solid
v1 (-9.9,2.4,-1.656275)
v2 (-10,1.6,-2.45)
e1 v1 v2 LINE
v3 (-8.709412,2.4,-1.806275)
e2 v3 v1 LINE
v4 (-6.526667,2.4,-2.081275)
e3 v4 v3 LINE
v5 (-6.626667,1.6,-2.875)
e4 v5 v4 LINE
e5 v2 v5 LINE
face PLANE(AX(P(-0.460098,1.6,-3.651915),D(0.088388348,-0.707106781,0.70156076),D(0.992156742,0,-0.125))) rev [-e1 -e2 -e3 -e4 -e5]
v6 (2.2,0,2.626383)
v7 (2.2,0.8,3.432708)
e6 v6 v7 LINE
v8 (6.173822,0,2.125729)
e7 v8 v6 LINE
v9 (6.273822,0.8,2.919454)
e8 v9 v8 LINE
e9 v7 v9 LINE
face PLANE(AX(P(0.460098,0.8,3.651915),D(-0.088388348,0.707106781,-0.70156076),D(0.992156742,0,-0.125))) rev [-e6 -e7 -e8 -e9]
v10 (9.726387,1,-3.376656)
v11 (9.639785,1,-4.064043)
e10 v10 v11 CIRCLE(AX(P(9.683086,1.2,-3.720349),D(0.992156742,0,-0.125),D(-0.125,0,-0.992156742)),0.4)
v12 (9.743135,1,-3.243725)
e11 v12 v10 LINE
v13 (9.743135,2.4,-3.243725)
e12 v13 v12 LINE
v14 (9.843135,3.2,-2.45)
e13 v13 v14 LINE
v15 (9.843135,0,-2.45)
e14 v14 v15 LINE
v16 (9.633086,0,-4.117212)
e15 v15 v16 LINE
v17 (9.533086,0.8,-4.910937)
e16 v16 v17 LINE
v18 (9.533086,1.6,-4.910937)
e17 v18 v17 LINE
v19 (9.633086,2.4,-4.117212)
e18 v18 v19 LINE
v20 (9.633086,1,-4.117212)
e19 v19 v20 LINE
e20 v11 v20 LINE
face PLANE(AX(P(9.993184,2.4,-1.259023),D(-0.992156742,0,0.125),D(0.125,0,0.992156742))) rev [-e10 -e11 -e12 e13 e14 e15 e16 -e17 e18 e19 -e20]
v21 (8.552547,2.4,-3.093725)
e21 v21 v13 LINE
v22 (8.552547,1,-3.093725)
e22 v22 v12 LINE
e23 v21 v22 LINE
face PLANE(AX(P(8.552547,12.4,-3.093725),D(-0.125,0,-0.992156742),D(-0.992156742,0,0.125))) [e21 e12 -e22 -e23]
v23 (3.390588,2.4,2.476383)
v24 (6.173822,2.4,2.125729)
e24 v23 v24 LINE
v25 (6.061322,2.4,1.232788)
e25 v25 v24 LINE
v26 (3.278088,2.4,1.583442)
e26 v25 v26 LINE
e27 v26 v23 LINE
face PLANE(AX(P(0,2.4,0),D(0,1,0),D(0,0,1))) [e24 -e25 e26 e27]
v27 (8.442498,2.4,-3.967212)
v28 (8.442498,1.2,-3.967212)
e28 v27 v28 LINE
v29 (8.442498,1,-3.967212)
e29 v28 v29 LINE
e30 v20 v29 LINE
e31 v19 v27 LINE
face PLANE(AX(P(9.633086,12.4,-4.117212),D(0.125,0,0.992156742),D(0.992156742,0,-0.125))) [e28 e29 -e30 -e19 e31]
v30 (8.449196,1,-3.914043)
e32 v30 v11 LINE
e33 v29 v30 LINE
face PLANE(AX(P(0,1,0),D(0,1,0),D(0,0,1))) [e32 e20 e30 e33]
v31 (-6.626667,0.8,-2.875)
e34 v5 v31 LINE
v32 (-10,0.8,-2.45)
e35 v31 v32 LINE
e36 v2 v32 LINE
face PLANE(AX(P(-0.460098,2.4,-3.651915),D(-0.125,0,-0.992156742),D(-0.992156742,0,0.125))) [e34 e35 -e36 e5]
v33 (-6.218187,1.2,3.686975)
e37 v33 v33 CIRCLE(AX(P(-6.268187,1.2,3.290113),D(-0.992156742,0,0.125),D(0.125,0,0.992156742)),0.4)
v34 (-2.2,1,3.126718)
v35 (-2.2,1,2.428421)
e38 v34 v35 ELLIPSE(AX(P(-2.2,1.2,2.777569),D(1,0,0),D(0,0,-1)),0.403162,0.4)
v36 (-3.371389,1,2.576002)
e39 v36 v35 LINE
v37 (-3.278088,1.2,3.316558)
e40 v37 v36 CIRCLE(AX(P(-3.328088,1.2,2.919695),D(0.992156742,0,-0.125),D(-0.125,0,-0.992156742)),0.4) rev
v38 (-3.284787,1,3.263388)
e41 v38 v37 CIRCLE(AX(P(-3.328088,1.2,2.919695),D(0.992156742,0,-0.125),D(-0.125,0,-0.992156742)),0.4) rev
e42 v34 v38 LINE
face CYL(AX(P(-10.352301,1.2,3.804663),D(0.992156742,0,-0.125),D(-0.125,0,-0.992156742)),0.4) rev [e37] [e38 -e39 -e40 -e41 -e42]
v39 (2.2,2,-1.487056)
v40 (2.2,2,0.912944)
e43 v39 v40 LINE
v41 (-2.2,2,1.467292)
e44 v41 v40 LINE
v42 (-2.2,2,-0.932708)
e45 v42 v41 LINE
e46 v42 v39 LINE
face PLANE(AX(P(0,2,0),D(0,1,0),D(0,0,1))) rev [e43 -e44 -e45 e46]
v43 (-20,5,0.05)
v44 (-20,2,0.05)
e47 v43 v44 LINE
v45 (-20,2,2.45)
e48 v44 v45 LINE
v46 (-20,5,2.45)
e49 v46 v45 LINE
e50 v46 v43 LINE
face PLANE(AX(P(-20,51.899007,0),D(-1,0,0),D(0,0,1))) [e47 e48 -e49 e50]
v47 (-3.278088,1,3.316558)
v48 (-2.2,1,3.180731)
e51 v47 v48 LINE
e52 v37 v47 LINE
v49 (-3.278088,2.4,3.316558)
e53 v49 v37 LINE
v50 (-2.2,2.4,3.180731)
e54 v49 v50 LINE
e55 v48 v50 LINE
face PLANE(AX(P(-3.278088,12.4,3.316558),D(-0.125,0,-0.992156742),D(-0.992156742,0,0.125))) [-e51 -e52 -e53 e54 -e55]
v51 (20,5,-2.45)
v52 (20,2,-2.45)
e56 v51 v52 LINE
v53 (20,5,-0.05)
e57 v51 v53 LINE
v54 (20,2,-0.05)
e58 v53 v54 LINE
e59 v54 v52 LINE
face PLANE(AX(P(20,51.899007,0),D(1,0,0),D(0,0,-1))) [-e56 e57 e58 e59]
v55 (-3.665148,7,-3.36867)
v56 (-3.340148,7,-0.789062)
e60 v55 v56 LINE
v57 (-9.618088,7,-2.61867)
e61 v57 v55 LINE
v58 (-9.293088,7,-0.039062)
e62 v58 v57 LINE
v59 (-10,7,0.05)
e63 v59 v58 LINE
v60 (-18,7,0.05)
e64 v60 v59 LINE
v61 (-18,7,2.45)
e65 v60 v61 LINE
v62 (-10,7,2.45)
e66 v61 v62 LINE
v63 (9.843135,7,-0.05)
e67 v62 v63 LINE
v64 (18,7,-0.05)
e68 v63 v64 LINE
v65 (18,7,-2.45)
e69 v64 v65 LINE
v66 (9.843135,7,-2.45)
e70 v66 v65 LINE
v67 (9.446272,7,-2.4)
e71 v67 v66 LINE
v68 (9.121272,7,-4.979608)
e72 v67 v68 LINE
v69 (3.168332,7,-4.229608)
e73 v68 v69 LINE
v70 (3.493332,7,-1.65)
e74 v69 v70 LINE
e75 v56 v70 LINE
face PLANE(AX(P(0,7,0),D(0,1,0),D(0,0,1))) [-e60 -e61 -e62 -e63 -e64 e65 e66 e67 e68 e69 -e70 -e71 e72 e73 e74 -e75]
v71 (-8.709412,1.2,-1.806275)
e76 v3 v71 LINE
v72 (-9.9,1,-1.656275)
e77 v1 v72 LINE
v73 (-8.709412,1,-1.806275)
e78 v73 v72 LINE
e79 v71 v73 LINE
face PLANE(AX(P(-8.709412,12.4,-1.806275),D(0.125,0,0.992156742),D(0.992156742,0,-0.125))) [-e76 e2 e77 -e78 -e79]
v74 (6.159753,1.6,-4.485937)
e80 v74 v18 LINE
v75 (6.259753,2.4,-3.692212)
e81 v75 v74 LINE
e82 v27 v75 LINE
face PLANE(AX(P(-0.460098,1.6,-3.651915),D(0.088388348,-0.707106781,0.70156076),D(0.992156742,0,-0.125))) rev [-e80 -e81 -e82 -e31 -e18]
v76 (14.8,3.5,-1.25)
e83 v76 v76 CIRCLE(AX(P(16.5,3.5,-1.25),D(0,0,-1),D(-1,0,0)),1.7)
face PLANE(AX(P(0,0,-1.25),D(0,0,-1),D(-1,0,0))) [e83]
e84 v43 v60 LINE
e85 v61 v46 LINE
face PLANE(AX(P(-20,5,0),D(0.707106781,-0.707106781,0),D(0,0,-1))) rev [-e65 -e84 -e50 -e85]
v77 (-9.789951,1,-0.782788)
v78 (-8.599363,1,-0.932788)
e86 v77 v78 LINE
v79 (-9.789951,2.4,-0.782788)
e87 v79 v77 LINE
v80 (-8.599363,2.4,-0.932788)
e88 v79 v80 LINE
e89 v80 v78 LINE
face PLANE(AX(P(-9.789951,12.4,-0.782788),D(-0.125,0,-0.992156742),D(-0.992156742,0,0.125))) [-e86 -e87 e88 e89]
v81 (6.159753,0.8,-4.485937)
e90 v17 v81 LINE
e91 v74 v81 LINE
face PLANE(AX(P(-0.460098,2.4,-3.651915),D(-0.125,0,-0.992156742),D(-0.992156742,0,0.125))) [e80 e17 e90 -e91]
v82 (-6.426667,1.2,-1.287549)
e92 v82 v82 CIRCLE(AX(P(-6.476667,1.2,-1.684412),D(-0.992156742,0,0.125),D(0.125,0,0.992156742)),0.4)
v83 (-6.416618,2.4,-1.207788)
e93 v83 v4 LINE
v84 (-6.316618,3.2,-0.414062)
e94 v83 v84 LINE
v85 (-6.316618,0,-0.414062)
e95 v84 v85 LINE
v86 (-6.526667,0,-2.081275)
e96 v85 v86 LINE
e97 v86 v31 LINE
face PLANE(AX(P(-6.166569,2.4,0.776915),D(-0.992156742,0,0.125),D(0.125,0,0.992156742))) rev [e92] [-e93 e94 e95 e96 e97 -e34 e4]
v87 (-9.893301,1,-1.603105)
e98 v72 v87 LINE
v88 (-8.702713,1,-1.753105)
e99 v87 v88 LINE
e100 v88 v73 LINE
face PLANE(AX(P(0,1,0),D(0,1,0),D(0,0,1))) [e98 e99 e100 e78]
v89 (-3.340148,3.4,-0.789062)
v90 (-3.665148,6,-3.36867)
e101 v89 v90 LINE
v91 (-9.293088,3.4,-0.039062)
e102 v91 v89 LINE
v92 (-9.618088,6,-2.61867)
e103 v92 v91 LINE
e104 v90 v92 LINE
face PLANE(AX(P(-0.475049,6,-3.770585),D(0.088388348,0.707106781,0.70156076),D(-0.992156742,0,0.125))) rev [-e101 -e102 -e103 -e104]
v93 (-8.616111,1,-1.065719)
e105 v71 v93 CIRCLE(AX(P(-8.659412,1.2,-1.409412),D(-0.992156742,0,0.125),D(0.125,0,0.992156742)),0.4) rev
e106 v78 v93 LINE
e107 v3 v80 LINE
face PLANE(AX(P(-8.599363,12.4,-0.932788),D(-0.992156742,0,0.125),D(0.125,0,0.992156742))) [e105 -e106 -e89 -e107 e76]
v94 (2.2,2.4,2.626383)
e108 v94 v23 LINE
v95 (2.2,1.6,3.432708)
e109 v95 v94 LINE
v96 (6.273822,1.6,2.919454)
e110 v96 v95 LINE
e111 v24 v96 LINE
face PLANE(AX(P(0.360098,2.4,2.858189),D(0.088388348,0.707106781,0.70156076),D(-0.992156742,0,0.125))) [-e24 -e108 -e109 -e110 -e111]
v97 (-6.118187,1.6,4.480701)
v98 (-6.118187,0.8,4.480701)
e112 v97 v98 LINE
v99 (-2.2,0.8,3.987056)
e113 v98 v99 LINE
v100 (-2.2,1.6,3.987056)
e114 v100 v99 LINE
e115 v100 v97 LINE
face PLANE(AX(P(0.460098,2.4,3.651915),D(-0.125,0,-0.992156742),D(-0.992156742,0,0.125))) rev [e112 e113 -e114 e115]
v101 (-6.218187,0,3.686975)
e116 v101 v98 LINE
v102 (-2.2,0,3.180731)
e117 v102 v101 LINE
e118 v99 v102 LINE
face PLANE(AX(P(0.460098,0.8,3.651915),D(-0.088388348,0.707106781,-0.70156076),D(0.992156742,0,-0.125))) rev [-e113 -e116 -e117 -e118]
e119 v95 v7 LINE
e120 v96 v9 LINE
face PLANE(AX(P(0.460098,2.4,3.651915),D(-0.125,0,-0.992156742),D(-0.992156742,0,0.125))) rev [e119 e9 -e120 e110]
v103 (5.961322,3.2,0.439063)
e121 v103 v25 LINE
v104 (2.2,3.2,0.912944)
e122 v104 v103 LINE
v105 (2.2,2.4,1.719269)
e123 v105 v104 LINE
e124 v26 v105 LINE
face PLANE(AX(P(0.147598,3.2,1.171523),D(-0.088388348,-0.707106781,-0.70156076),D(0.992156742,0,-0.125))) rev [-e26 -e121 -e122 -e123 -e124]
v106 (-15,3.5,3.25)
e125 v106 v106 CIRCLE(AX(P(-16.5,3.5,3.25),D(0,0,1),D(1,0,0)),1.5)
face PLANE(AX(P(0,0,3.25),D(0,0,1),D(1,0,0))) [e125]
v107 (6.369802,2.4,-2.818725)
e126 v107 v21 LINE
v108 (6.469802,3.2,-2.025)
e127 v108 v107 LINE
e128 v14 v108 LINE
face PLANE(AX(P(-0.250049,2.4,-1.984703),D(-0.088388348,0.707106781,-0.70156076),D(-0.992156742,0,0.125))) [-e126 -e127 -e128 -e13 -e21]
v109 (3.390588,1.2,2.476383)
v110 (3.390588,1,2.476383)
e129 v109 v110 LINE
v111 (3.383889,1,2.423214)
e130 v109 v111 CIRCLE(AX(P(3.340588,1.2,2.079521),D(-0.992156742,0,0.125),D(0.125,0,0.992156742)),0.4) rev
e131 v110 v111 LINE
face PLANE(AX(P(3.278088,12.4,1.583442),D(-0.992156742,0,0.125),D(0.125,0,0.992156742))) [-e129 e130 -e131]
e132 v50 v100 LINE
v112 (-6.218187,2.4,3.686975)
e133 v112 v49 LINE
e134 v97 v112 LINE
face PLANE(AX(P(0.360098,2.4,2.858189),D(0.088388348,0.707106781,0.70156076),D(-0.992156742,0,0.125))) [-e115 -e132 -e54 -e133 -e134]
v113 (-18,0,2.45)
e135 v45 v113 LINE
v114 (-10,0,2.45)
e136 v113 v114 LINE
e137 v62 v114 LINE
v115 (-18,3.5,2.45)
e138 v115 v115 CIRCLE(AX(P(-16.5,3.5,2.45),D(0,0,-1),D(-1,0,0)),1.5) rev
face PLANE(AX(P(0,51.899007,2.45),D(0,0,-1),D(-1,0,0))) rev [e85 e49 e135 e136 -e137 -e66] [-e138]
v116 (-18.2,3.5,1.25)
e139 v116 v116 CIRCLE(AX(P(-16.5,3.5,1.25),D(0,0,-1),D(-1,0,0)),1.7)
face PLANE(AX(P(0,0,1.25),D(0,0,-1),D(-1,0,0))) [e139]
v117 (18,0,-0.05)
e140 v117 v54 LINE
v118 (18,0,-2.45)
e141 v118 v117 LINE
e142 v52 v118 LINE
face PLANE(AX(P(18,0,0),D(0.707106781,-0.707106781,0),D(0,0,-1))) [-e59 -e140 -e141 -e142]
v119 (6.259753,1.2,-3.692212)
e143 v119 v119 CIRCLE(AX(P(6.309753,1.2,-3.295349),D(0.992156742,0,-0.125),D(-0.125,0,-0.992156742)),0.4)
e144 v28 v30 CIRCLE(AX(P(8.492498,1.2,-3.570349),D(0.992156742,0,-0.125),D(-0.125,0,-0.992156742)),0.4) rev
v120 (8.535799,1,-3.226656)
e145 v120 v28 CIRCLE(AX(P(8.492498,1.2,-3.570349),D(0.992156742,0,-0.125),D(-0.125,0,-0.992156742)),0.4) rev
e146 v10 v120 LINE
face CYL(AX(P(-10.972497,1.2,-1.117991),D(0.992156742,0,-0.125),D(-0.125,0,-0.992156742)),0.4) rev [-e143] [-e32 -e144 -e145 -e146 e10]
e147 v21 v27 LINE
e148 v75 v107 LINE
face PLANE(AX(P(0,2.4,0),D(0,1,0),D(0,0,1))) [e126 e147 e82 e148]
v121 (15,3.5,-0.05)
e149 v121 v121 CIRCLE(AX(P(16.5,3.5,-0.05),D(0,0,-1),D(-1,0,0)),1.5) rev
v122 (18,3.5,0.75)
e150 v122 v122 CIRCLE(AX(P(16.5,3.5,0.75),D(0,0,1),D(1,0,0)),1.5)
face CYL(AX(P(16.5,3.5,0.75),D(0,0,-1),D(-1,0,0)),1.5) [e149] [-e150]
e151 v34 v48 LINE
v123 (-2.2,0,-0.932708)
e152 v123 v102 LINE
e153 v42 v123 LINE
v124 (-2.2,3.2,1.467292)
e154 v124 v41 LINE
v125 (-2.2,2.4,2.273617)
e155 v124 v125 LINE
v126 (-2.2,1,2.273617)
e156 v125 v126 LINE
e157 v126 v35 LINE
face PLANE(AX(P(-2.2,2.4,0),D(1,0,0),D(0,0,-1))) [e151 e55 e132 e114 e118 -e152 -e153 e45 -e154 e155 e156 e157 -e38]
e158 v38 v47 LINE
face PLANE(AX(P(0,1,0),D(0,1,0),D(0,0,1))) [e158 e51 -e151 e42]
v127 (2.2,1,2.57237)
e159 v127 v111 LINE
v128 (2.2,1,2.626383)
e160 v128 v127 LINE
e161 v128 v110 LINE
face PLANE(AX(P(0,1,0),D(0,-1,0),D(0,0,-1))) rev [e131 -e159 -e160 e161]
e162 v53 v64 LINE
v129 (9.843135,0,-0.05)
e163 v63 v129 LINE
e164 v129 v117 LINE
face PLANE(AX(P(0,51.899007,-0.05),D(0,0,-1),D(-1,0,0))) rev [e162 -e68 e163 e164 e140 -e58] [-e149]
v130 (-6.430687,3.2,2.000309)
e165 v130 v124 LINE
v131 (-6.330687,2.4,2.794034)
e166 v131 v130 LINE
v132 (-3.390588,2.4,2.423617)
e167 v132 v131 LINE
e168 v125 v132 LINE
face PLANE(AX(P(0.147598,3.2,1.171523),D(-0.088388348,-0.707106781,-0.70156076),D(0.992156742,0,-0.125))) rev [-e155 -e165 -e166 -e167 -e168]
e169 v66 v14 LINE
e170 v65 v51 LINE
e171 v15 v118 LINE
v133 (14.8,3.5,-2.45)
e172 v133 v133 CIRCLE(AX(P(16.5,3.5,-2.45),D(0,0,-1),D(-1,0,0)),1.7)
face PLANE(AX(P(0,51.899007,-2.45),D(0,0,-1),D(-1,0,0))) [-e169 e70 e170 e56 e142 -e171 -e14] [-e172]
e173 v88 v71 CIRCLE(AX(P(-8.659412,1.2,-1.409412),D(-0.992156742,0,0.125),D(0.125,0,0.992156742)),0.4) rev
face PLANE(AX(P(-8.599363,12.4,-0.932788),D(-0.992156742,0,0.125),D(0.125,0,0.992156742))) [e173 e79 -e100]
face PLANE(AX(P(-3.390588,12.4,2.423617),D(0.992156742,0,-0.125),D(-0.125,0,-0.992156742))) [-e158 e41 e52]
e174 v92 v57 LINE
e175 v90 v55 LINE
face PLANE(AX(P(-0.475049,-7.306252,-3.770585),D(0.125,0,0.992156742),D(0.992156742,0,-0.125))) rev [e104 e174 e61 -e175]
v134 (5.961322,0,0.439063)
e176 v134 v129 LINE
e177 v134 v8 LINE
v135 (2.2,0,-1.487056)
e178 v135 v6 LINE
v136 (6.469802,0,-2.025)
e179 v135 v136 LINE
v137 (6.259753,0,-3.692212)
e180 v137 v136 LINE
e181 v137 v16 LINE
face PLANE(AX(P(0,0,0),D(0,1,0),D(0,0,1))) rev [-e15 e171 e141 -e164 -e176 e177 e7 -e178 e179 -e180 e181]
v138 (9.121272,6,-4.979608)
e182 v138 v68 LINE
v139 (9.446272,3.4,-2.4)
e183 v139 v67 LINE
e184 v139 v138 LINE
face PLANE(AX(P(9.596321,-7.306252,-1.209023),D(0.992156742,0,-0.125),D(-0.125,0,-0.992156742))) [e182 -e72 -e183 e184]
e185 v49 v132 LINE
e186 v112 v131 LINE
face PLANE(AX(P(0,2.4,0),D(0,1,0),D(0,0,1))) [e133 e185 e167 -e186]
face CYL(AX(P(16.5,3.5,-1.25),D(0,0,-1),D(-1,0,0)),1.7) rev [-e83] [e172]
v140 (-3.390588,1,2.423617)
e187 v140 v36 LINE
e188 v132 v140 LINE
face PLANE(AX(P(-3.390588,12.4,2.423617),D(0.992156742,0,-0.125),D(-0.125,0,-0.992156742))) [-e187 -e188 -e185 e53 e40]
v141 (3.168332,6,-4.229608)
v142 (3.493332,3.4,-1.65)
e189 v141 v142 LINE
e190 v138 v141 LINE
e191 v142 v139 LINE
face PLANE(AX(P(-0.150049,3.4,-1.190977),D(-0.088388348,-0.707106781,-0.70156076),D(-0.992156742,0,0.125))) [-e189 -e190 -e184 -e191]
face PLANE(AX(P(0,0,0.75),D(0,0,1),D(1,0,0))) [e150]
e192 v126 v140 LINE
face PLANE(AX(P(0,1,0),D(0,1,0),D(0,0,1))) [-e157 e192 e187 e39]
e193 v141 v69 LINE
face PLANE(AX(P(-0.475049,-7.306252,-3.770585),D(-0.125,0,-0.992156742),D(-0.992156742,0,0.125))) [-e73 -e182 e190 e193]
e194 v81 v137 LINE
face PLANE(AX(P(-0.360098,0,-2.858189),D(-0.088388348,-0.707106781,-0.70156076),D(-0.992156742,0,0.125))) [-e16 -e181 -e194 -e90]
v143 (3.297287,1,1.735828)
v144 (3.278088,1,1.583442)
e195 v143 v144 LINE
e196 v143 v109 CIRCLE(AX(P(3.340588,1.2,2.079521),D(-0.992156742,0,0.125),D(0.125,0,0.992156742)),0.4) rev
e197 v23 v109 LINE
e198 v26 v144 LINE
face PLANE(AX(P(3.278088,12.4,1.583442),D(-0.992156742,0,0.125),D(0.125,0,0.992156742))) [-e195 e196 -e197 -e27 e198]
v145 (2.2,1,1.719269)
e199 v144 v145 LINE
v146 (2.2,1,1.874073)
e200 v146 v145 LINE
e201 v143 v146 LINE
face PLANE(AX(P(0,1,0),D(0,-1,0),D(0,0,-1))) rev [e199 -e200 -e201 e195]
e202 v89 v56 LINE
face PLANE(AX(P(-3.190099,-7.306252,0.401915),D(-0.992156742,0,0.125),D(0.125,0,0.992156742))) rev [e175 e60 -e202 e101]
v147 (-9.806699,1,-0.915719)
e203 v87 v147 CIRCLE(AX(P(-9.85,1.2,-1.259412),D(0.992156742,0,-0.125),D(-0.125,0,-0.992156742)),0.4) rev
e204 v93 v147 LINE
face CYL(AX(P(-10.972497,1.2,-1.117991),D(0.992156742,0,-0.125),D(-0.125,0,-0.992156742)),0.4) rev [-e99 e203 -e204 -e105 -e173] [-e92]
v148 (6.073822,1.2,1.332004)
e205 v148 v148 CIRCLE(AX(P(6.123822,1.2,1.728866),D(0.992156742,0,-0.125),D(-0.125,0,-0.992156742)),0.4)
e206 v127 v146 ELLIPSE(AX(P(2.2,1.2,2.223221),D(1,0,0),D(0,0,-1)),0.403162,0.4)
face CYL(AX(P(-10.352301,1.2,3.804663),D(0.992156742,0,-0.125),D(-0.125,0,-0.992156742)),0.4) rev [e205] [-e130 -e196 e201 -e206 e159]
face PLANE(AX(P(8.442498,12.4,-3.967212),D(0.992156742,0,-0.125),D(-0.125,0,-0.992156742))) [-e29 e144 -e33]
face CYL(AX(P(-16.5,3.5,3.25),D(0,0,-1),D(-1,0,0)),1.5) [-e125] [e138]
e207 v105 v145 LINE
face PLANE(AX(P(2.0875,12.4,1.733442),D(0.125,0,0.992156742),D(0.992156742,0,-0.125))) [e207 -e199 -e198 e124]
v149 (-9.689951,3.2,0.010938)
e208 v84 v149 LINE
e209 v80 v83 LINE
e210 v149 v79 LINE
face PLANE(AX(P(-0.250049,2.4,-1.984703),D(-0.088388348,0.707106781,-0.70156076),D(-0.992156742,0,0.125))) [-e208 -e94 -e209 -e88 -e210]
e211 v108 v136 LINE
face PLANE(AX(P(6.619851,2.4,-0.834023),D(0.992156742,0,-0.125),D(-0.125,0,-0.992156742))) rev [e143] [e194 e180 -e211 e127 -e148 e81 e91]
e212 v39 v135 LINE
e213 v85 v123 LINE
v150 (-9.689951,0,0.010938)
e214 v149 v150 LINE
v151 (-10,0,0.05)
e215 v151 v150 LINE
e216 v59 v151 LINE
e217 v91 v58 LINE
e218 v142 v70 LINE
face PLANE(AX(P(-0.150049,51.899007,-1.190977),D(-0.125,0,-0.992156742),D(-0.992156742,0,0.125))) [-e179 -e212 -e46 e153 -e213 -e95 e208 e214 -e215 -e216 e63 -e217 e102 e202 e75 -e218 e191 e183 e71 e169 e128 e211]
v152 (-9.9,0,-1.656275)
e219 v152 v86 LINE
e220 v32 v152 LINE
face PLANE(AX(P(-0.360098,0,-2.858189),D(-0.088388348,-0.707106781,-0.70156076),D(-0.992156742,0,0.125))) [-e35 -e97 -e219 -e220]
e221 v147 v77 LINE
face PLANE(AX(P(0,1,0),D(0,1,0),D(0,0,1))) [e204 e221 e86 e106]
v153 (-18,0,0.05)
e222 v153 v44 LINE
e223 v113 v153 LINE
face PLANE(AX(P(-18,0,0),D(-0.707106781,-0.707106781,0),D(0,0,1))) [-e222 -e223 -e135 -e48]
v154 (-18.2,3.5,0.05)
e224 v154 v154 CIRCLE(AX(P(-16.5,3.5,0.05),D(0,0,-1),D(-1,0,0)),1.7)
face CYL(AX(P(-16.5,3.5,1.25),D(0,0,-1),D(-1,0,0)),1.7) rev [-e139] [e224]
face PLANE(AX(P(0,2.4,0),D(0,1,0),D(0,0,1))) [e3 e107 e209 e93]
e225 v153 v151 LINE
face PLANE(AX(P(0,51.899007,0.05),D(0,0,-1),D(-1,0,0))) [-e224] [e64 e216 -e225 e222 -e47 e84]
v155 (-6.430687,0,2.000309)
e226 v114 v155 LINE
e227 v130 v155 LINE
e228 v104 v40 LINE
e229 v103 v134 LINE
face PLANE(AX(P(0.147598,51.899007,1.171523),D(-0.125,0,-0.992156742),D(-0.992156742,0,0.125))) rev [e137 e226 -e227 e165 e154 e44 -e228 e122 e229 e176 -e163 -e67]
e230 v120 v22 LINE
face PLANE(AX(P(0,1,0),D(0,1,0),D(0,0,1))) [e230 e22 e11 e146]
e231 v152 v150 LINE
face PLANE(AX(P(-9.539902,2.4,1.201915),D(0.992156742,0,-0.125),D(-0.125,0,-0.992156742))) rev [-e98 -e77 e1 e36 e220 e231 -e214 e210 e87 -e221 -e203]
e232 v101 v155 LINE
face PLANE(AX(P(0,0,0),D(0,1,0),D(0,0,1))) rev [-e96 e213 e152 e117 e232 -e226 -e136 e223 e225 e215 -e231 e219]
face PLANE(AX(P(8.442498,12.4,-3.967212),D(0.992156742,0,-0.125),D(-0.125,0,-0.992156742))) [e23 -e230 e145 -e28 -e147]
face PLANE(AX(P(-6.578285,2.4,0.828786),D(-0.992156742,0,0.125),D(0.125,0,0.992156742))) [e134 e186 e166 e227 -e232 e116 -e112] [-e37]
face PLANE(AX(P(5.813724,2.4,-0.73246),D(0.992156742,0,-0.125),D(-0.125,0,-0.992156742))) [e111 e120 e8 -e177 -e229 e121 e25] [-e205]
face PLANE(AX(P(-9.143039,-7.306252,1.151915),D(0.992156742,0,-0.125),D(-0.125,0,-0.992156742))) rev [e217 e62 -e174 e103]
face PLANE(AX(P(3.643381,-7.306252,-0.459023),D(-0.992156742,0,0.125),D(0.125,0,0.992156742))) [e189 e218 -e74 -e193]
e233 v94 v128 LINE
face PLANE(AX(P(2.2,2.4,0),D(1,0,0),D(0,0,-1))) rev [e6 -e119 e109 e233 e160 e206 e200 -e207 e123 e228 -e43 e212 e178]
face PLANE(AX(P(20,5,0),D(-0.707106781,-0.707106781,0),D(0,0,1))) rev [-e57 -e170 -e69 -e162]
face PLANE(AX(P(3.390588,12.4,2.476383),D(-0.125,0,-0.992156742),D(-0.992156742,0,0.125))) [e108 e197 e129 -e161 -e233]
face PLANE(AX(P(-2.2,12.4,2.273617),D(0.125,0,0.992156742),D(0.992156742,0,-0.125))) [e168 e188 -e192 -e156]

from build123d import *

# Parameters (mm, degrees)
BOSS_EXTRUDE4_DEPTH      = 2.4
BOSS_EXTRUDE4_2_DEPTH    = 2.4
BOSS_EXTRUDE4_3_DEPTH    = 2.4
BOSS_EXTRUDE4_4_DEPTH    = 2.4
BOSS_EXTRUDE5_DEPTH      = 7
SKETCH2_R                = 1.499999999999997
BOSS_EXTRUDE8_DEPTH      = 0.8
SKETCH3_R                = 1.5000000000000007
BOSS_EXTRUDE9_DEPTH      = 0.8
SKETCH4_R                = 1.6999999999999995
CUT_EXTRUDE3_DEPTH       = 1.2
SKETCH5_R                = 1.6999999999999995
CUT_EXTRUDE4_DEPTH       = 1.2
CHAMFER4_SIZE            = 2
CUT_EXTRUDE7_REACH       = 33.329
SKETCH8_R                = 0.3999999999999905
SKETCH8_R_2              = 0.4000000000000032
CUT_EXTRUDE10_DEPTH      = 2
CHAMFER6_SIZE            = 0.8
CUT_EXTRUDE11_DEPTH      = 10
CUT_EXTRUDE11_DEPTH_BACK = 1.4
BOSS_EXTRUDE10_DEPTH     = 3.6
CHAMFER8_SIZE            = 2.6


with BuildPart() as part:
    # Sketch1 → Boss-Extrude4 (new body)
    with BuildSketch(Plane(origin=(0, 0, 0), x_dir=(1, 0, 0), z_dir=(0, 1, 0))):
        Polygon((-6.430686748297487, -2.000308799271804), (-6.118186748297487, -4.480700653394857), (-2.1999999999999993, -3.9870555235708633), (-2.1999999999999997, -1.4672923701760037), align=None)
    extrude(amount=BOSS_EXTRUDE4_DEPTH)



with BuildPart() as body_2:
    # Sketch1 → Boss-Extrude4 2 (new body)
    with BuildSketch(Plane(origin=(0, 0, 0), x_dir=(1, 0, 0), z_dir=(0, 1, 0))):
        Polygon((-10.000000000000064, 2.4499999999999993), (-9.689951018234682, -0.01093750000000027), (-6.316618096627332, 0.41406249999999967), (-6.626667078392713, 2.8750000000000004), align=None)
    extrude(amount=BOSS_EXTRUDE4_2_DEPTH)


with BuildPart() as body_3:
    # Sketch1 → Boss-Extrude4 3 (new body)
    with BuildSketch(Plane(origin=(0, 0, 0), x_dir=(1, 0, 0), z_dir=(0, 1, 0))):
        Polygon((5.961321581281771, -0.4390625000000079), (2.200000000000001, -0.9129444764291388), (2.200000000000001, -3.432707629823996), (6.273821581281774, -2.919454354123064), align=None)
    extrude(amount=BOSS_EXTRUDE4_3_DEPTH)


with BuildPart() as body_4:
    # Sketch1 → Boss-Extrude4 4 (new body)
    with BuildSketch(Plane(origin=(0, 0, 0), x_dir=(1, 0, 0), z_dir=(0, 1, 0))):
        Polygon((6.159752929611616, 4.485937500000006), (6.469801911377001, 2.025000000000001), (9.843134832984354, 2.4499999999999993), (9.533085851218969, 4.910937500000012), align=None)
    extrude(amount=BOSS_EXTRUDE4_4_DEPTH)


with BuildPart() as part_1:
    add(part.part)

    add(body_2.part)  # Boss-Extrude5 merges body 2

    add(body_3.part)  # Boss-Extrude5 merges body 3

    add(body_4.part)  # Boss-Extrude5 merges body 4
    # Sketch1<8> → Boss-Extrude5 (add)
    with BuildSketch(Plane(origin=(0, 0, 0), x_dir=(1, 0, 0), z_dir=(0, 1, 0))):
        Polygon((-20, -0.05000000000000027), (-20, -2.45), (-12, -2.4499999999999997), (-10.000000000000064, -2.4499999999999997), (-6.430686748297488, -2.000308799271796), (-2.5125, -1.5066636694477982), (-2.1999999999999993, -1.467292370176004), (-2.1999999999999997, 0.9327076298239989), (-6.316618096627332, 0.41406249999999967), (-9.689951018234682, -0.01093750000000025), (-10.000000000000064, -0.05000000000000029), (-12, -0.05000000000000027), align=None)
        Polygon((2.2000000000000006, 1.487055523570866), (2.2000000000000006, -0.9129444764291423), (5.961321581281771, -0.4390625000000079), (9.687500000000064, 0.03039185412306233), (9.843134832984425, 0.05000000000000027), (12, 0.05000000000000013), (20, 0.05000000000000013), (20, 2.4499999999999997), (12, 2.4499999999999993), (9.843134832984353, 2.4499999999999993), (6.469801911376997, 2.024999999999999), (2.510048981765383, 1.526118023570866), align=None)
        Polygon((-2.1999999999999997, 0.9327076298239989), (-2.1999999999999997, -1.4672923701760037), (2.200000000000001, -0.9129444764291388), (2.2000000000000006, 1.487055523570866), align=None)
    extrude(amount=BOSS_EXTRUDE5_DEPTH)

    # Sketch2 → Boss-Extrude8 (add)
    with BuildSketch(Plane.XY.offset(2.4499999999999993)):
        with Locations(Location((-16.5, 3.4999999999999996, 0), (0, 0, 180))):
            Circle(SKETCH2_R)
    extrude(amount=BOSS_EXTRUDE8_DEPTH)

    # Sketch3 → Boss-Extrude9 (add)
    with BuildSketch(Plane.XY.offset(-0.05000000000000013)):
        with Locations(Location((16.5, 3.4999999999999996, 0), (0, 0, 180))):
            Circle(SKETCH3_R)
    extrude(amount=BOSS_EXTRUDE9_DEPTH)

    # Sketch4 → Cut-Extrude3 (cut)
    with BuildSketch(Plane(origin=(0, 0, 0.05000000000000041), x_dir=(-1, 0, -5e-17), z_dir=(5e-17, 0, -1))):
        with Locations((16.5, 3.4999999999999996)):
            Circle(SKETCH4_R)
    extrude(amount=-CUT_EXTRUDE3_DEPTH, mode=Mode.SUBTRACT)

    # Sketch5 → Cut-Extrude4 (cut)
    with BuildSketch(Plane(origin=(-1e-16, 0, -2.449999999999999), x_dir=(-1, 0, 5e-17), z_dir=(-5e-17, 0, -1))):
        with Locations((-16.5, 3.4999999999999996)):
            Circle(SKETCH5_R)
    extrude(amount=-CUT_EXTRUDE4_DEPTH, mode=Mode.SUBTRACT)

    # Chamfer4
    chamfer4_edges = [part_1.edges().sort_by_distance(p)[0] for p in [
        (20, 7, -1.25),
        (-20, 7, 1.2500000000000002),
        (-20, 0, 1.2500000000000002),
        (20, 0, -1.25),
    ]]
    chamfer(chamfer4_edges, length=CHAMFER4_SIZE)

    # Cut-Extrude7: up to this face of the body (flat: up to its plane)
    cut_extrude7_end = Plane(part_1.part.faces().sort_by_distance((-9.844975509, 1.2, -1.21953125))[0])
    # Sketch8 → Cut-Extrude7 (cut, up to the picked face)
    with BuildSketch(Plane(origin=(9.99318385334905, 0, -1.2590228229384695), x_dir=(-0.12500000000000053, 0, -0.9921567416492215), z_dir=(0.9921567416492215, 0, -0.12500000000000053)), mode=Mode.PRIVATE) as cut_extrude7_sk1:
        with Locations((2.4807840170405906, 1.2000000000000017)):
            Circle(SKETCH8_R)
    cut_extrude7_tool1 = split(extrude(cut_extrude7_sk1.sketch, amount=-CUT_EXTRUDE7_REACH, mode=Mode.PRIVATE), bisect_by=cut_extrude7_end, keep=Keep.BOTH, mode=Mode.PRIVATE)
    # Sketch8 → Cut-Extrude7 (cut, up to the picked face)
    with BuildSketch(Plane(origin=(9.99318385334905, 0, -1.2590228229384695), x_dir=(-0.12500000000000053, 0, -0.9921567416492215), z_dir=(0.9921567416492215, 0, -0.12500000000000053)), mode=Mode.PRIVATE) as cut_extrude7_sk2:
        with Locations((-2.4807840170405973, 1.200000000000001)):
            Circle(SKETCH8_R_2)
    cut_extrude7_tool2 = split(extrude(cut_extrude7_sk2.sketch, amount=-CUT_EXTRUDE7_REACH, mode=Mode.PRIVATE), bisect_by=cut_extrude7_end, keep=Keep.BOTH, mode=Mode.PRIVATE)
    add(cut_extrude7_tool1.solids().sort_by(Axis((9.683086, 1.2, -3.720349), (-0.9921567416492215, 0, 0.12500000000000053)))[0], mode=Mode.SUBTRACT)
    add(cut_extrude7_tool2.solids().sort_by(Axis((10.303282, 1.2, 1.202304), (-0.9921567416492215, 0, 0.12500000000000053)))[0], mode=Mode.SUBTRACT)

    # Sketch1<10> → Cut-Extrude10 (cut)
    with BuildSketch(Plane(origin=(0, 0, 0), x_dir=(1, 0, 0), z_dir=(0, 1, 0))):
        Polygon((-2.1999999999999997, 0.9327076298239989), (-2.1999999999999997, -1.4672923701760037), (2.200000000000001, -0.9129444764291388), (2.2000000000000006, 1.487055523570866), align=None)
        Polygon((-2.2, 3.432707629823986), (-2.1999999999999997, 0.9327076298239989), (2.200000000000001, 1.487055523570866), (2.2, 3.987055523570867), align=None)
        Polygon((2.200000000000001, -0.9129444764291388), (-2.1999999999999993, -1.467292370176004), (-2.1999999999999993, -3.9870555235708607), (2.200000000000003, -3.432707629823997), align=None)
    extrude(amount=CUT_EXTRUDE10_DEPTH, mode=Mode.SUBTRACT)

    # Chamfer6
    chamfer6_edges = [part_1.edges().sort_by_distance(p)[0] for p in [
        (4.080660790640886, 2.4, 0.6760034882145733),
        (-4.315343374148743, 2.4, 1.7338005847239037),
        (-4.159093374148743, 0, 4.233878088482863),
        (-4.159093374148743, 2.4, 4.233878088482863),
        (7.846419390415299, 2.4, -4.698437499999993),
        (8.156468372180676, 2.4, -2.237499999999999),
        (7.846419390415299, 0, -4.698437499999993),
        (4.236910790640888, 2.4, 3.1760809919735298),
        (-8.313333539196389, 2.4, -2.6624999999999988),
        (-8.003284557431007, 2.4, -0.20156249999999976),
        (-8.313333539196389, 0, -2.6624999999999988),
        (4.236910790640888, 0, 3.1760809919735298),
    ]]
    chamfer(chamfer6_edges, length=CHAMFER6_SIZE)

    # Sketch9 → Cut-Extrude11 (cut, two sides: drawn at the far end of the back side and taken through both)
    with BuildSketch(Plane(origin=(0, 2.4, 0), x_dir=(1, 0, 0), z_dir=(0, 1, 0)).offset(-CUT_EXTRUDE11_DEPTH_BACK)):
        Polygon((-9.900000000000063, 1.6562746066806198), (-9.789951018234682, 0.7827878933193786), (-8.599362928255616, 0.9327878933193787), (-8.709411910020998, 1.8062746066806201), align=None)
        Polygon((-2.1999999999999993, -2.2736165792623466), (-3.390588089979065, -2.423616579262345), (-3.2780880899790614, -3.3165576467466713), (-2.087499999999996, -3.1665576467466714), align=None)
        Polygon((2.200000000000001, -2.626383420737649), (2.087499999999998, -1.733442353253328), (3.278088089979064, -1.5834423532533284), (3.3905880899790666, -2.47638342073765), align=None)
        Polygon((9.633085851218974, 4.117212106680604), (8.442497761239908, 3.967212106680604), (8.552546743005287, 3.0937253933193816), (9.743134832984353, 3.2437253933193815), align=None)
    extrude(amount=CUT_EXTRUDE11_DEPTH + CUT_EXTRUDE11_DEPTH_BACK, mode=Mode.SUBTRACT)

    # Sketch10 → Boss-Extrude10 (add)
    with BuildSketch(Plane(origin=(0, 6.999999999999999, 0), x_dir=(1, 0, 0), z_dir=(0, 1, 0))):
        Polygon((9.121272136324666, 4.979607528287985), (3.168331686429335, 4.22960752828798), (3.493331686429336, 1.6499999999999986), (9.446272136324666, 2.4000000000000035), align=None)
        Polygon((-9.618088321575, 2.6186700282879727), (-9.293088321574997, 0.03906249999999938), (-3.3401478716796675, 0.7890624999999998), (-3.665147871679668, 3.3686700282879767), align=None)
    extrude(amount=-BOSS_EXTRUDE10_DEPTH)

    # Chamfer8
    chamfer8_edges = [part_1.edges().sort_by_distance(p)[0] for p in [
        (-6.641618096627334, 3.399999999999999, -2.9936700282879745),
        (6.144801911377001, 3.399999999999999, -4.604607528287982),
    ]]
    chamfer(chamfer8_edges, length=CHAMFER8_SIZE - 0.0001)  # a hair under: the kernel refuses the full size


solid = part_1.part
